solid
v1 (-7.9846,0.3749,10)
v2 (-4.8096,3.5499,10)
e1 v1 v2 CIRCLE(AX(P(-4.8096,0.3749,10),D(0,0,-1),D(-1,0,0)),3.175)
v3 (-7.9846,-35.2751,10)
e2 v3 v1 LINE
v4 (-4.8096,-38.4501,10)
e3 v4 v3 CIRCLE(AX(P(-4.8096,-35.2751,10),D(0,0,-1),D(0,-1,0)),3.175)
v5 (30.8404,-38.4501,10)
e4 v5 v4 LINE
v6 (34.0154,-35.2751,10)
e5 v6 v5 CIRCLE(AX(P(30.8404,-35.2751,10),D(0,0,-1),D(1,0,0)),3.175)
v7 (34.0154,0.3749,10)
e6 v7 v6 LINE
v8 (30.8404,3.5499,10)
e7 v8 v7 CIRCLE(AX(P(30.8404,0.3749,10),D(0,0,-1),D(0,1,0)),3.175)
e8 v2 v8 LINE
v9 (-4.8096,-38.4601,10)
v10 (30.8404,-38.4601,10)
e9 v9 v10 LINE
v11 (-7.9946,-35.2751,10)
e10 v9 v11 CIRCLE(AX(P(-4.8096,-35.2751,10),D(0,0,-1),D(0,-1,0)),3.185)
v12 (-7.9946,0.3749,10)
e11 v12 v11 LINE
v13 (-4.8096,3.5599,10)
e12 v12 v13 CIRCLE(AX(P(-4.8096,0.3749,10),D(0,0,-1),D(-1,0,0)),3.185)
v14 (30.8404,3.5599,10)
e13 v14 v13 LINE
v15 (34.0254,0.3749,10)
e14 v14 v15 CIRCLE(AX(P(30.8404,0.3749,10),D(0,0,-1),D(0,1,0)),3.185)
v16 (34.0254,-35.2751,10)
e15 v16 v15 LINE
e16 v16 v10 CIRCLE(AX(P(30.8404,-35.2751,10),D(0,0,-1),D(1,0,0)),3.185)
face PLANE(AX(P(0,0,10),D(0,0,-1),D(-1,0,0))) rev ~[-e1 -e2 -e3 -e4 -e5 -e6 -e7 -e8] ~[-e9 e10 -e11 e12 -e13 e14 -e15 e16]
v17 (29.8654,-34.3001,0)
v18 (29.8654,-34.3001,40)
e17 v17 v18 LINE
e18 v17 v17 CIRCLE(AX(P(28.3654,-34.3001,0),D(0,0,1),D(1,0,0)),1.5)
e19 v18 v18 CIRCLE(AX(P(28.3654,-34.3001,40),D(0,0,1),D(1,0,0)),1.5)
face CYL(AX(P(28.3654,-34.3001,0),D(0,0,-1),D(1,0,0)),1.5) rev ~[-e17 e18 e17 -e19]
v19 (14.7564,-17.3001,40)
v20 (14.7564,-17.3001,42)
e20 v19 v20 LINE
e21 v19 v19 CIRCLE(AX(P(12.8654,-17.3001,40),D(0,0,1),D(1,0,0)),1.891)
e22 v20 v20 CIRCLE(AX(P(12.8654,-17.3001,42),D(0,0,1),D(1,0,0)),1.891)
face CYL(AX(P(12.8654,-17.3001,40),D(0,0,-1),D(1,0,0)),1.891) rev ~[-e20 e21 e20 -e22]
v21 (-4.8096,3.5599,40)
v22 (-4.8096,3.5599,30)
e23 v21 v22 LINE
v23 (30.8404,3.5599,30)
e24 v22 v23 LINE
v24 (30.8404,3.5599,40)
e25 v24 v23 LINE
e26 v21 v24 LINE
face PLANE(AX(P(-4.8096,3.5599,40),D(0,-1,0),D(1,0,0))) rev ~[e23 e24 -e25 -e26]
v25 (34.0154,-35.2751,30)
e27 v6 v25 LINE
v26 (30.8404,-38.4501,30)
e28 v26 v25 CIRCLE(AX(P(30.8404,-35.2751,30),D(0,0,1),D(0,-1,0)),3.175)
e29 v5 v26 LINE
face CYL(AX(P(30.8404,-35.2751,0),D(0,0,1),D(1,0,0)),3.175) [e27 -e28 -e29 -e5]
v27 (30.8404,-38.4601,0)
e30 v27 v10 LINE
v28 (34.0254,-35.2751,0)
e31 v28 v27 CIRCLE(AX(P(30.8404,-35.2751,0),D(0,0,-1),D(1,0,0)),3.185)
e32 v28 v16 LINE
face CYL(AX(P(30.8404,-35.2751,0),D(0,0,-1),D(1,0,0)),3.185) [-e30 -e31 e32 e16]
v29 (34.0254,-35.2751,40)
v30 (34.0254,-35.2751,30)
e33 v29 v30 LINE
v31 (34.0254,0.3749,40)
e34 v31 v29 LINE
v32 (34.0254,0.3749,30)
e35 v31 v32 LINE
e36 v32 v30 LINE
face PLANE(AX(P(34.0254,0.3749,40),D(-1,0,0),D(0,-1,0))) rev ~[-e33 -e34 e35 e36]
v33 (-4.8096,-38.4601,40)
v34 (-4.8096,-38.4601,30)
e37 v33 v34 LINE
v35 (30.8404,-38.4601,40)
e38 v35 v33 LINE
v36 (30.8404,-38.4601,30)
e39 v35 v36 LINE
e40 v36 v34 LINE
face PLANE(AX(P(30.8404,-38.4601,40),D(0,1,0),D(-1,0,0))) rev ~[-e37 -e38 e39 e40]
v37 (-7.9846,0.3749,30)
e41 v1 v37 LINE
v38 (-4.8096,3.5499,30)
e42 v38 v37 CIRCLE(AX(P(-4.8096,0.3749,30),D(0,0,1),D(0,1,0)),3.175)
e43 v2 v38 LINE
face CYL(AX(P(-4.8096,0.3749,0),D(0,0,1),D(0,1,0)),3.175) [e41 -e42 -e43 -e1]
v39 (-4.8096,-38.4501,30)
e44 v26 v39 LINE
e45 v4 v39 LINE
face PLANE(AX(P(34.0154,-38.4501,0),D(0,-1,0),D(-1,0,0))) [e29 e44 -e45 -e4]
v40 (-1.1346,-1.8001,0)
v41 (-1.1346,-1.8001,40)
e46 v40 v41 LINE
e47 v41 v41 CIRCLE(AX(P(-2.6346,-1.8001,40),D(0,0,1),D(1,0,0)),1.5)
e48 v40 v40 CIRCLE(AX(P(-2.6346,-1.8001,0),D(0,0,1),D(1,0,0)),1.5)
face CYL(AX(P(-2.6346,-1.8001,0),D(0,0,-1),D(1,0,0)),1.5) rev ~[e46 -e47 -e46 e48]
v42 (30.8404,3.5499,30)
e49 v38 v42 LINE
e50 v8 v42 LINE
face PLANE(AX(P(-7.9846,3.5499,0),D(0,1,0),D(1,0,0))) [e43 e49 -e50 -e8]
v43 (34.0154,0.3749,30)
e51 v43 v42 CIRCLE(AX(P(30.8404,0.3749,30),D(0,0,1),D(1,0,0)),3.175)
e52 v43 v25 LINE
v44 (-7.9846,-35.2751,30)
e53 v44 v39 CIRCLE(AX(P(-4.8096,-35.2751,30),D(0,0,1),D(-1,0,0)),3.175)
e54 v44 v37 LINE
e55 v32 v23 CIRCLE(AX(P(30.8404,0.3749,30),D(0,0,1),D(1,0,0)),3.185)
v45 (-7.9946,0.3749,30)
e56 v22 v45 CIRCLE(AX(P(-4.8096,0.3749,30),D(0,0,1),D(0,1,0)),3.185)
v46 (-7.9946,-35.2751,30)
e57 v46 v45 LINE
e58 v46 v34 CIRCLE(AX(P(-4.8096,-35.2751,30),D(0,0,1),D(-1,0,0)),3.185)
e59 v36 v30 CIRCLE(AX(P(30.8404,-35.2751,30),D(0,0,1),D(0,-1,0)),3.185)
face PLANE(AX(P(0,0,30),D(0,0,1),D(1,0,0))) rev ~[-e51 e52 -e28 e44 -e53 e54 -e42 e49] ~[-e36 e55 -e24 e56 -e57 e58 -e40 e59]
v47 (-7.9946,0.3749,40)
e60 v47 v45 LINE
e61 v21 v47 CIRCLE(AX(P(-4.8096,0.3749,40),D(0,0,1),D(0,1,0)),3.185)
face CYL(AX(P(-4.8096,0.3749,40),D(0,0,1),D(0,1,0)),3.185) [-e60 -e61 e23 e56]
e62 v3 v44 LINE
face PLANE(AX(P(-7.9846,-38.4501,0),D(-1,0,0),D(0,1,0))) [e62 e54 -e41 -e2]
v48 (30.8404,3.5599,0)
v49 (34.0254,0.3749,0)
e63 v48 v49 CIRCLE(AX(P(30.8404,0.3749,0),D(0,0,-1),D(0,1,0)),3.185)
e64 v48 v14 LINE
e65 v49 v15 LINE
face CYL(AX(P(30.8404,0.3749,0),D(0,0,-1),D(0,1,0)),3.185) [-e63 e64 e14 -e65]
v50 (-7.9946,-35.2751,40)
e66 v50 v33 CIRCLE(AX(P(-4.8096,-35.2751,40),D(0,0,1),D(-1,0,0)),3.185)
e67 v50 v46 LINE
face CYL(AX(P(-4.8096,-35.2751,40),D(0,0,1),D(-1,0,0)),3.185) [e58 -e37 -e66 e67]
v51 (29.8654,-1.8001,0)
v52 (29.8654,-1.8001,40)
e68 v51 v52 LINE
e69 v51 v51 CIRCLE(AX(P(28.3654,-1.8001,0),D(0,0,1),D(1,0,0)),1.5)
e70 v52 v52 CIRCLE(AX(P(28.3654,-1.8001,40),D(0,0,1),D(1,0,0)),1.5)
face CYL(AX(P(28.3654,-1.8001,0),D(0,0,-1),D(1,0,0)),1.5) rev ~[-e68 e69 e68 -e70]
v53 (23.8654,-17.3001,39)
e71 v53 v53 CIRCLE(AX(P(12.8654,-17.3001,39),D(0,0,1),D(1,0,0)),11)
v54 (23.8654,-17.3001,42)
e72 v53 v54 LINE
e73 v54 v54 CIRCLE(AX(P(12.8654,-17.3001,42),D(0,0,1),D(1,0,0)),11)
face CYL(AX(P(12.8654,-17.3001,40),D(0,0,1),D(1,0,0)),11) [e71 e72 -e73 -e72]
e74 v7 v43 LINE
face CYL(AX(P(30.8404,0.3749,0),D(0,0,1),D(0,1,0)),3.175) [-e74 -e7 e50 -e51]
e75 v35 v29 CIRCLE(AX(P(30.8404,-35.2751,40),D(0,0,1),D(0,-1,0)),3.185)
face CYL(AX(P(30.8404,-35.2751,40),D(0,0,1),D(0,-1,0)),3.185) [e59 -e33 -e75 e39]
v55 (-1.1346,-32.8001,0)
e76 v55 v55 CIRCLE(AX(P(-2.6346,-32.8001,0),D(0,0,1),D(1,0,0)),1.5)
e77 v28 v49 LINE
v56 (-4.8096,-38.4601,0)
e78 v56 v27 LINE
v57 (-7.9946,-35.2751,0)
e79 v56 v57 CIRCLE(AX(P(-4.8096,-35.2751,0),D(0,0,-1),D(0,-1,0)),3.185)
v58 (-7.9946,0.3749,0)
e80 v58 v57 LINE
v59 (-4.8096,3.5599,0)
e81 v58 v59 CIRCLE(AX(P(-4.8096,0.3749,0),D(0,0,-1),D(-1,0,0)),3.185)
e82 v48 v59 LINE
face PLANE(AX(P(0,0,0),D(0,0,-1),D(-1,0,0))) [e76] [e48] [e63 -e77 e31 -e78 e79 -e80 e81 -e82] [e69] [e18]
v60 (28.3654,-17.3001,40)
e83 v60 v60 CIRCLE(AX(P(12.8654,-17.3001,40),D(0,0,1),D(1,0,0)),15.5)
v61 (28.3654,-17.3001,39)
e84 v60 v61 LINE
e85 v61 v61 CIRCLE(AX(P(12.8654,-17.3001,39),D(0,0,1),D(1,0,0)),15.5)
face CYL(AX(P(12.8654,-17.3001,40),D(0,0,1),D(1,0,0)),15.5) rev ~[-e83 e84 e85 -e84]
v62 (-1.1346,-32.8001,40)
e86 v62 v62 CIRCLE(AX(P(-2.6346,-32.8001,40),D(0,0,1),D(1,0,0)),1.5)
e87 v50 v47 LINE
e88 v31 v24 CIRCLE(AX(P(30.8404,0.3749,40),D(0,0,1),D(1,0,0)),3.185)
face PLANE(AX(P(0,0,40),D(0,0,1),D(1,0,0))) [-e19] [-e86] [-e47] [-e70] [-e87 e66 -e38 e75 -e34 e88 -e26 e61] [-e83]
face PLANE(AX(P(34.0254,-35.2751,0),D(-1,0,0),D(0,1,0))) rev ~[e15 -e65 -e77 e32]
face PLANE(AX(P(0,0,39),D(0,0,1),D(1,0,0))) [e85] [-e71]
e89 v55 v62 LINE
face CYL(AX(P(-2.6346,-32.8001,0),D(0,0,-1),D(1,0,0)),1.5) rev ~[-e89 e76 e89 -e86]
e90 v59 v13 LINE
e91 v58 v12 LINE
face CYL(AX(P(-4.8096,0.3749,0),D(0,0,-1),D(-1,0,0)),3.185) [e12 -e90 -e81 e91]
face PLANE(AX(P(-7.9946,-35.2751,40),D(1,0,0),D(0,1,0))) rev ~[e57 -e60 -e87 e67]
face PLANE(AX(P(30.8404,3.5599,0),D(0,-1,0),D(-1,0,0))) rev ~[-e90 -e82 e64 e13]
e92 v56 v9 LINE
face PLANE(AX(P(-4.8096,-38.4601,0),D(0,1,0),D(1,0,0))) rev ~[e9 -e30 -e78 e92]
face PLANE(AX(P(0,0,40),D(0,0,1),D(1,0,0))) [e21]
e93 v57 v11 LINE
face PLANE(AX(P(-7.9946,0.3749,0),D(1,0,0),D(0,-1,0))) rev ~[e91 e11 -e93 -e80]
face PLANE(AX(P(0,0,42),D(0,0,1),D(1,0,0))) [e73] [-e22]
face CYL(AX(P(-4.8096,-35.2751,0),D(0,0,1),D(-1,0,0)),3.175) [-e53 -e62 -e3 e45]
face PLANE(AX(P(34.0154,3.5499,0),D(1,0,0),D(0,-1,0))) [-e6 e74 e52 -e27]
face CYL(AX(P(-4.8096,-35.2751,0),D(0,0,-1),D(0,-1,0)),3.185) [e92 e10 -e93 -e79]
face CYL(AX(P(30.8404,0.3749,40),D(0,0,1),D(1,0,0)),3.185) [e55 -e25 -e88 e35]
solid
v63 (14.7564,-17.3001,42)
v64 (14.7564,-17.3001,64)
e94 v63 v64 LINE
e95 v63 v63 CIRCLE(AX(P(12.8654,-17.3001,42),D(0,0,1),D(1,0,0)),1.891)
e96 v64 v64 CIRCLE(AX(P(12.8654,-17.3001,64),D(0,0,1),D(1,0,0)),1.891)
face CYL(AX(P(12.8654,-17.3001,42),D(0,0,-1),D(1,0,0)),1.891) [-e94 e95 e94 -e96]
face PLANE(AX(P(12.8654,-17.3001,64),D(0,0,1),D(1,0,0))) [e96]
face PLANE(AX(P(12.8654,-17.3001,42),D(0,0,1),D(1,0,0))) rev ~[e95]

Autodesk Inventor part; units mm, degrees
ref_plane "YZ Plane" through (0, 0, 0) normal (1, 0, 0) x (0, 1, 0)
ref_plane "XZ Plane" through (0, 0, 0) normal (0, 1, 0) x (-1, 0, 0)
ref_plane "XY Plane" through (0, 0, 0) normal (0, 0, 1) x (1, 0, 0)
sketch "Sketch1" plane through (0, 0, 0) normal (0, 0, 1) x (1, 0, 0)
  line L0 (-7.9846, 3.5499) -> (34.0154, 3.5499)
  line L1 (34.0154, 3.5499) -> (34.0154, -38.4501)
  line L2 (34.0154, -38.4501) -> (-7.9846, -38.4501)
  line L3 (-7.9846, -38.4501) -> (-7.9846, 3.5499)
  circle A0 centre (12.8654, -17.3001) radius 11
  circle A1 centre (12.8654, -17.3001) radius 1.891
  circle A2 centre (12.8654, -17.3001) radius 15.5
  circle A3 centre (-2.6346, -32.8001) radius 1.5
  circle A4 centre (28.3654, -34.3001) radius 1.5
  circle A5 centre (28.3654, -1.8001) radius 1.5
  circle A6 centre (-2.6346, -1.8001) radius 1.5
  point P0 (0, 0)
  dimension "d0" = 42
  dimension "d1" = 42
  dimension "d2" = 22
  dimension "d3" = 31
  dimension "d4" = 3
  dimension "d5" = 3
  dimension "d6" = 3
  dimension "d7" = 3
extrude "Extrusion1" add sketch "Sketch1" along normal blind 40 contours L0 L1 L2 L3 | A0 | A1 | A2
fillet "Fillet1" radius 3.175 4 edges at (34.0154, 3.5499, 20) (-7.9846, 3.5499, 20) (34.0154, -38.4501, 20) (-7.9846, -38.4501, 20)
sketch "Sketch2" plane through (0, 0, 40) normal (0, 0, 1) x (1, 0, 0)
  circle A0 centre (12.8654, -17.3001) radius 15.5 projected
  circle A1 centre (12.8654, -17.3001) radius 1.891 projected
  circle A2 centre (12.8654, -17.3001) radius 11 projected
  point P0 (0, 0)
extrude "Extrusion2" add sketch "Sketch2" along normal blind 2 contours A2
sketch "Sketch3" plane through (0, 0, 40) normal (0, 0, 1) x (1, 0, 0)
  circle A0 centre (12.8654, -17.3001) radius 11 projected
  circle A1 centre (12.8654, -17.3001) radius 15.5 projected
  point P0 (0, 0)
extrude "Extrusion3" cut sketch "Sketch3" against normal blind 1
sketch "Sketch4" plane through (12.8654, -17.3001, 42) normal (0, 0, 1) x (1, 0, 0)
  circle A0 centre (0, 0) radius 1.891 projected
  point P0 (-12.8654, 17.3001)
extrude "Akse længde" add sketch "Sketch4" along normal blind 22
sketch "Sketch5" plane through (0, 0, 40) normal (0, 0, 1) x (1, 0, 0)
  arc A0 (-7.9846, -35.2751) -> (-4.8096, -38.4501) centre (-4.8096, -35.2751) ccw projected
  line L0 (30.8404, -38.4501) -> (-4.8096, -38.4501) projected
  arc A1 (30.8404, -38.4501) -> (34.0154, -35.2751) centre (30.8404, -35.2751) ccw projected
  line L1 (34.0154, 0.3749) -> (34.0154, -35.2751) projected
  arc A2 (34.0154, 0.3749) -> (30.8404, 3.5499) centre (30.8404, 0.3749) ccw projected
  line L2 (-4.8096, 3.5499) -> (30.8404, 3.5499) projected
  arc A3 (-4.8096, 3.5499) -> (-7.9846, 0.3749) centre (-4.8096, 0.3749) ccw projected
  line L3 (-7.9846, -35.2751) -> (-7.9846, 0.3749) projected
  arc A4 (34.0254, 0.3749) -> (30.8404, 3.5599) centre (30.8404, 0.3749) ccw
  line L4 (34.0254, 0.3749) -> (34.0254, -35.2751)
  arc A5 (30.8404, -38.4601) -> (34.0254, -35.2751) centre (30.8404, -35.2751) ccw
  line L5 (30.8404, -38.4601) -> (-4.8096, -38.4601)
  arc A6 (-7.9946, -35.2751) -> (-4.8096, -38.4601) centre (-4.8096, -35.2751) ccw
  line L6 (-7.9946, -35.2751) -> (-7.9946, 0.3749)
  arc A7 (-4.8096, 3.5599) -> (-7.9946, 0.3749) centre (-4.8096, 0.3749) ccw
  line L7 (-4.8096, 3.5599) -> (30.8404, 3.5599)
  point P0 (0, 0)
  dimension "d21" = 0.01
extrude "Extrusion5" add sketch "Sketch5" against normal blind 10
sketch "Sketch6" plane through (0, 0, 0) normal (0, 0, -1) x (-1, 0, 0)
  arc A0 (4.8096, -38.4501) -> (7.9846, -35.2751) centre (4.8096, -35.2751) ccw projected
  line L0 (7.9846, -35.2751) -> (7.9846, 0.3749) projected
  arc A1 (7.9846, 0.3749) -> (4.8096, 3.5499) centre (4.8096, 0.3749) ccw projected
  line L1 (4.8096, 3.5499) -> (-30.8404, 3.5499) projected
  arc A2 (-30.8404, 3.5499) -> (-34.0154, 0.3749) centre (-30.8404, 0.3749) ccw projected
  line L2 (-34.0154, 0.3749) -> (-34.0154, -35.2751) projected
  arc A3 (-34.0154, -35.2751) -> (-30.8404, -38.4501) centre (-30.8404, -35.2751) ccw projected
  line L3 (-30.8404, -38.4501) -> (4.8096, -38.4501) projected
  line L4 (7.9946, 0.3749) -> (7.9946, -35.2751)
  arc A4 (4.8096, -38.4601) -> (7.9946, -35.2751) centre (4.8096, -35.2751) ccw
  line L5 (4.8096, -38.4601) -> (-30.8404, -38.4601)
  arc A5 (-34.0254, -35.2751) -> (-30.8404, -38.4601) centre (-30.8404, -35.2751) ccw
  line L6 (-34.0254, -35.2751) -> (-34.0254, 0.3749)
  arc A6 (-30.8404, 3.5599) -> (-34.0254, 0.3749) centre (-30.8404, 0.3749) ccw
  line L7 (-30.8404, 3.5599) -> (4.8096, 3.5599)
  arc A7 (7.9946, 0.3749) -> (4.8096, 3.5599) centre (4.8096, 0.3749) ccw
  point P0 (0, 0)
  dimension "d22" = 0.01
extrude "Extrusion6" add sketch "Sketch6" against normal blind 10
properties part number "Nema17 - 40mm BRUG DENNE"
